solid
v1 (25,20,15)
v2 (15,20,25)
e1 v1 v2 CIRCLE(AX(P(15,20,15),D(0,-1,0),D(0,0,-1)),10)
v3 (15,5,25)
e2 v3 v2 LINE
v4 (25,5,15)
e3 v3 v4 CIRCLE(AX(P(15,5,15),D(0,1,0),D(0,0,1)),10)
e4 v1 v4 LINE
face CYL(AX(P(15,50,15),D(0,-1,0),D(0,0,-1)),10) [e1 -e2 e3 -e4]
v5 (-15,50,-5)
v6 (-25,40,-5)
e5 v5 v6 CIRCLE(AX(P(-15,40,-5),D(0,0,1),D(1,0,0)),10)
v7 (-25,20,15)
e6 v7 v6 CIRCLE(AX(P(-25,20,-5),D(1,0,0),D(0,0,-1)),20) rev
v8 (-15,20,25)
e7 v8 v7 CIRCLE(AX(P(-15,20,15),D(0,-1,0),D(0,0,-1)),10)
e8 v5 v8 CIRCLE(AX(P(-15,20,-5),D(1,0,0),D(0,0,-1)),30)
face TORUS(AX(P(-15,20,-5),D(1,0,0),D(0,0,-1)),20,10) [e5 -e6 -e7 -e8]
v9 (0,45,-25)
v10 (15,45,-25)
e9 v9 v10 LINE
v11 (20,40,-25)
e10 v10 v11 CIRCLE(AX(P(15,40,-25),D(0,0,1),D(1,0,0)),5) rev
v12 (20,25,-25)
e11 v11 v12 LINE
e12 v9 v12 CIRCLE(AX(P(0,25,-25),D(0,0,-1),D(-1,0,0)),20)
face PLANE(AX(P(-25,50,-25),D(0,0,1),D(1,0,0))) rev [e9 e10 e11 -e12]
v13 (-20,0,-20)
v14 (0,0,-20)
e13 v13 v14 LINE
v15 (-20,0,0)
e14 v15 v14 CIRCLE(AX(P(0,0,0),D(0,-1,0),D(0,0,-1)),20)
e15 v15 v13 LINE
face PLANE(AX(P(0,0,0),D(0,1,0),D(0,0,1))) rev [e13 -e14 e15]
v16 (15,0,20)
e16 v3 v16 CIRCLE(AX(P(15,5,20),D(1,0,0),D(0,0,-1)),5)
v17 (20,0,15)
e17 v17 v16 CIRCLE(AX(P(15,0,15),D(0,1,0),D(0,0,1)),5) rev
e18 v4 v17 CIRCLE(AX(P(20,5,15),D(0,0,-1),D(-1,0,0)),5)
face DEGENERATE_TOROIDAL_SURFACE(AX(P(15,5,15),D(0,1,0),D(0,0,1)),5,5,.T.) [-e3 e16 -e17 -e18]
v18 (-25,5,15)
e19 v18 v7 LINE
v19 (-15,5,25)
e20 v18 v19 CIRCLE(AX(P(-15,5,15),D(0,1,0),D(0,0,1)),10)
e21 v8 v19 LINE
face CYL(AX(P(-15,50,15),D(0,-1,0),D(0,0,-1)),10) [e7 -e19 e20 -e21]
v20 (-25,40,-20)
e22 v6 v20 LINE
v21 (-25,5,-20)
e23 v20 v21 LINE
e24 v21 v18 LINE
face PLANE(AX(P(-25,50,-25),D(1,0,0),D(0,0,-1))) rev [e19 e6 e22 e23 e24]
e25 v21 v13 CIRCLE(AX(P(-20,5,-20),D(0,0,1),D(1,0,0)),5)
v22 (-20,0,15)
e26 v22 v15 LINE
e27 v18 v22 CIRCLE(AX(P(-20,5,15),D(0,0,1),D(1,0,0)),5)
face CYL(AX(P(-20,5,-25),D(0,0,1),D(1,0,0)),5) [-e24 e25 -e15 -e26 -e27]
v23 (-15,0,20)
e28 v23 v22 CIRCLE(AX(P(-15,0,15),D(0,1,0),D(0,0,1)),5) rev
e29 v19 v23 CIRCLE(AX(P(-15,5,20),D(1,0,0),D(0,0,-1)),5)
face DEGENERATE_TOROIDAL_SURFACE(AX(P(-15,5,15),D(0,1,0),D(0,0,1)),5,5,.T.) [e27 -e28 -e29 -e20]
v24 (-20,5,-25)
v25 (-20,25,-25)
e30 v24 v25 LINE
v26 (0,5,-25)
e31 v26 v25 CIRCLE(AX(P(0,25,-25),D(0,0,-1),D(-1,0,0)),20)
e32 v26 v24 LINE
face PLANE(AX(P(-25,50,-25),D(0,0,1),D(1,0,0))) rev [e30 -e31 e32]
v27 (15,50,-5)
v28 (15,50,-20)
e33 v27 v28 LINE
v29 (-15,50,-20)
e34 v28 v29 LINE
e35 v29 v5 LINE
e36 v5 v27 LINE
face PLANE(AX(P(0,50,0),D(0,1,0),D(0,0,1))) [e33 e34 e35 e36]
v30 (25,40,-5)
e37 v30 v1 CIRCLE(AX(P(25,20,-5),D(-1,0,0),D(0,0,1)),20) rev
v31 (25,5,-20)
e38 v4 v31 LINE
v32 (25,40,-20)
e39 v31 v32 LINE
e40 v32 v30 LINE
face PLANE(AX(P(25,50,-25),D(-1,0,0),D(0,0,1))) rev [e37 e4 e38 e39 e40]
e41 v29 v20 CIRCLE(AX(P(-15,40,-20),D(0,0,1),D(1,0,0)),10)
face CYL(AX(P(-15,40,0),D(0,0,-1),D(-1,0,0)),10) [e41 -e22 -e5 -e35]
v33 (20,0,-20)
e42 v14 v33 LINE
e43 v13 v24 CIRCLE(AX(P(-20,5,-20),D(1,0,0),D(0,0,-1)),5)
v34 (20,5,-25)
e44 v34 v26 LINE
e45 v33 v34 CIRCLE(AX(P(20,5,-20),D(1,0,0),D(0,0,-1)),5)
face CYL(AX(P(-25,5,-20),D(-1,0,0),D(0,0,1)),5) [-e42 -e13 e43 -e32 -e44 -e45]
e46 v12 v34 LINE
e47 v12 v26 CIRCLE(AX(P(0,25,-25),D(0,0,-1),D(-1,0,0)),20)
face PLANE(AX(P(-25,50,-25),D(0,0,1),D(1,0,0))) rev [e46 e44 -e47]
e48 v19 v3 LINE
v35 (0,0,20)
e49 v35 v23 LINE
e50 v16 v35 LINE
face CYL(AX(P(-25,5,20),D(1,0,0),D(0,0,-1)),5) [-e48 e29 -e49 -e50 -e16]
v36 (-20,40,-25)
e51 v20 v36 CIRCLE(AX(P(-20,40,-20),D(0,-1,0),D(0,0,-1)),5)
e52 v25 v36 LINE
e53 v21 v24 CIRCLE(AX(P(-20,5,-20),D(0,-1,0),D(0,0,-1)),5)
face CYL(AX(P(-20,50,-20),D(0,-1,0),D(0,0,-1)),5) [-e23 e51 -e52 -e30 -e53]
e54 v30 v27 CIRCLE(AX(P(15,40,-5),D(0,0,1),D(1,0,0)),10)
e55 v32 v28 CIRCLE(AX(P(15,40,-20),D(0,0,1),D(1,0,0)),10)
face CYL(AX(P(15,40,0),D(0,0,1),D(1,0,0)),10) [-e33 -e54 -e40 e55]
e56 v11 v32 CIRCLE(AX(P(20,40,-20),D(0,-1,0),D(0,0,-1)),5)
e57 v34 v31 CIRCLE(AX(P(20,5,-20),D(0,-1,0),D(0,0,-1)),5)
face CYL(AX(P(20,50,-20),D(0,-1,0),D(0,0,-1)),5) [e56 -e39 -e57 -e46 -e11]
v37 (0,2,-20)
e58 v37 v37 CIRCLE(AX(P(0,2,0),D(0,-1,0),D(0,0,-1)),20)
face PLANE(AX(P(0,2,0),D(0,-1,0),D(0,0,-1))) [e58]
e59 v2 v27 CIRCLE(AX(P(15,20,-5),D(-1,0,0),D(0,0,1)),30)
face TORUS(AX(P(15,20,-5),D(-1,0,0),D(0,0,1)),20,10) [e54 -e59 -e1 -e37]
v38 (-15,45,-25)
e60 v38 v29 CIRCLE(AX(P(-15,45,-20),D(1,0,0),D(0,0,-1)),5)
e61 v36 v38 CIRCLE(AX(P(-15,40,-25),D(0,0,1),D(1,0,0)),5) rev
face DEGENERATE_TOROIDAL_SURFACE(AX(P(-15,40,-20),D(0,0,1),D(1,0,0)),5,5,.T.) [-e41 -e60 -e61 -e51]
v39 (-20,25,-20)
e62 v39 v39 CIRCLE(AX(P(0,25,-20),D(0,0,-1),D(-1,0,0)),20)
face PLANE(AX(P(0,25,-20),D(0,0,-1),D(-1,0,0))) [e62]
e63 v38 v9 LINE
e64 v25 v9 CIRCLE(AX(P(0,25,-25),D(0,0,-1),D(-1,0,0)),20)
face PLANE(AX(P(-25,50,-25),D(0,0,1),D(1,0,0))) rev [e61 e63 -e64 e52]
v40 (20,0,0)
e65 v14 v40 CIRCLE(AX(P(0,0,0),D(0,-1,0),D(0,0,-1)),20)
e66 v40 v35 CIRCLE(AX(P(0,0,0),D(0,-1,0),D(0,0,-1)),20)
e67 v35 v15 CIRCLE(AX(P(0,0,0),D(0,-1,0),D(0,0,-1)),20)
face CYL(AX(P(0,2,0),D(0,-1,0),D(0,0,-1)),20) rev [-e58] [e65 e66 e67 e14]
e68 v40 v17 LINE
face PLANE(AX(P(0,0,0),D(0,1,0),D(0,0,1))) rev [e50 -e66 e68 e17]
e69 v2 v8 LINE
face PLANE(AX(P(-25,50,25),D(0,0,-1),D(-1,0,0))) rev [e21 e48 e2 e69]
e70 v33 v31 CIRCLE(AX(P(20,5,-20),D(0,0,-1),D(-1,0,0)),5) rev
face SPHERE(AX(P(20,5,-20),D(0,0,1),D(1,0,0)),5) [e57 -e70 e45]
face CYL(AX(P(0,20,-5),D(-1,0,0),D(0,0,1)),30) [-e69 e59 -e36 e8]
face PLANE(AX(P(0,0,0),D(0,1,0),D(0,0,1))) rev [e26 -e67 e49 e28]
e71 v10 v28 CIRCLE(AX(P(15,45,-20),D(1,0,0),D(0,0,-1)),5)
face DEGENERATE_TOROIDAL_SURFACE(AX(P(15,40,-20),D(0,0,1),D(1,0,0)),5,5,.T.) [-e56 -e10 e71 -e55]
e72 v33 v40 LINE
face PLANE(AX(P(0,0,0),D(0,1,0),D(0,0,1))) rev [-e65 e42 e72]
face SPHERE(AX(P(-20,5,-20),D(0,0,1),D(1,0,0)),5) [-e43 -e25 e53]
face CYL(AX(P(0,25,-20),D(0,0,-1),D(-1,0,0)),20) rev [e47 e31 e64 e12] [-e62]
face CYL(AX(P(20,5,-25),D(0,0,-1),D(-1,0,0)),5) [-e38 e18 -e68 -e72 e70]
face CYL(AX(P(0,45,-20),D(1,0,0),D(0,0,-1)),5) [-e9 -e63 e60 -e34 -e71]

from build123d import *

# Parameters (mm, degrees)
SKETCH1_W           = 50
SKETCH1_H           = 50
BOSS_EXTRUDE1_DEPTH = 50
SKETCH2_R           = 20
CUT_EXTRUDE1_DEPTH  = 5
SKETCH3_R           = 20
CUT_EXTRUDE5_DEPTH  = 2
FILLET10_R          = 30
FILLET11_R          = 10
FILLET12_R          = 10
FILLET15_R          = 5
FILLET16_R          = 5


with BuildPart() as part:
    # Sketch1 → Boss-Extrude1 (new body)
    with BuildSketch(Plane(origin=(0, 0, 0), x_dir=(1, 0, 0), z_dir=(0, 1, 0))):
        Rectangle(SKETCH1_W, SKETCH1_H)
    extrude(amount=BOSS_EXTRUDE1_DEPTH)

    # Sketch2 → Cut-Extrude1 (cut)
    with BuildSketch(Plane(origin=(0, 0, -25), x_dir=(-1, 0, 0), z_dir=(0, 0, -1))):
        with Locations((0, 25)):
            Circle(SKETCH2_R)
    extrude(amount=-CUT_EXTRUDE1_DEPTH, mode=Mode.SUBTRACT)

    # Sketch3 → Cut-Extrude5 (cut)
    with BuildSketch(Plane.XZ):
        with Locations(Location((0, 0, 0), (0, 0, 270))):
            Circle(SKETCH3_R)
    extrude(amount=-CUT_EXTRUDE5_DEPTH, mode=Mode.SUBTRACT)

    # Fillet10
    fillet10_edges = [part.edges().sort_by_distance(p)[0] for p in [
        (0, 50, 25),
    ]]
    fillet(fillet10_edges, radius=FILLET10_R)

    # Fillet11
    fillet11_edges = [part.edges().sort_by_distance(p)[0] for p in [
        (25, 50, -15),
        (25, 10, 25),
        (25, 41.213203436, 16.213203436),
    ]]
    fillet(fillet11_edges, radius=FILLET11_R)

    # Fillet12
    fillet12_edges = [part.edges().sort_by_distance(p)[0] for p in [
        (-25, 50, -15),
        (-25, 10, 25),
        (-25, 41.213203436, 16.213203436),
    ]]
    fillet(fillet12_edges, radius=FILLET12_R)

    # Fillet15
    fillet15_edges = [part.edges().sort_by_distance(p)[0] for p in [
        (25, 0, -5),
        (22.071067812, 0, 22.071067812),
        (0, 0, 25),
        (-22.071067812, 0, 22.071067812),
        (-25, 0, -5),
    ]]
    fillet(fillet15_edges, radius=FILLET15_R - 0.0001)  # a hair under: the kernel refuses the full size

    # Fillet16
    fillet16_edges = [part.edges().sort_by_distance(p)[0] for p in [
        (25, 22.49995, -25),
        (0, 50, -25),
        (22.071067812, 47.071067812, -25),
        (-25, 22.49995, -25),
        (-22.071067812, 47.071067812, -25),
        (0, 0, -25),
        (-23.535563195, 1.464436805, -25),
        (23.535563195, 1.464436805, -25),
    ]]
    fillet(fillet16_edges, radius=FILLET16_R - 0.0001)  # a hair under: the kernel refuses the full size


solid = part.part
